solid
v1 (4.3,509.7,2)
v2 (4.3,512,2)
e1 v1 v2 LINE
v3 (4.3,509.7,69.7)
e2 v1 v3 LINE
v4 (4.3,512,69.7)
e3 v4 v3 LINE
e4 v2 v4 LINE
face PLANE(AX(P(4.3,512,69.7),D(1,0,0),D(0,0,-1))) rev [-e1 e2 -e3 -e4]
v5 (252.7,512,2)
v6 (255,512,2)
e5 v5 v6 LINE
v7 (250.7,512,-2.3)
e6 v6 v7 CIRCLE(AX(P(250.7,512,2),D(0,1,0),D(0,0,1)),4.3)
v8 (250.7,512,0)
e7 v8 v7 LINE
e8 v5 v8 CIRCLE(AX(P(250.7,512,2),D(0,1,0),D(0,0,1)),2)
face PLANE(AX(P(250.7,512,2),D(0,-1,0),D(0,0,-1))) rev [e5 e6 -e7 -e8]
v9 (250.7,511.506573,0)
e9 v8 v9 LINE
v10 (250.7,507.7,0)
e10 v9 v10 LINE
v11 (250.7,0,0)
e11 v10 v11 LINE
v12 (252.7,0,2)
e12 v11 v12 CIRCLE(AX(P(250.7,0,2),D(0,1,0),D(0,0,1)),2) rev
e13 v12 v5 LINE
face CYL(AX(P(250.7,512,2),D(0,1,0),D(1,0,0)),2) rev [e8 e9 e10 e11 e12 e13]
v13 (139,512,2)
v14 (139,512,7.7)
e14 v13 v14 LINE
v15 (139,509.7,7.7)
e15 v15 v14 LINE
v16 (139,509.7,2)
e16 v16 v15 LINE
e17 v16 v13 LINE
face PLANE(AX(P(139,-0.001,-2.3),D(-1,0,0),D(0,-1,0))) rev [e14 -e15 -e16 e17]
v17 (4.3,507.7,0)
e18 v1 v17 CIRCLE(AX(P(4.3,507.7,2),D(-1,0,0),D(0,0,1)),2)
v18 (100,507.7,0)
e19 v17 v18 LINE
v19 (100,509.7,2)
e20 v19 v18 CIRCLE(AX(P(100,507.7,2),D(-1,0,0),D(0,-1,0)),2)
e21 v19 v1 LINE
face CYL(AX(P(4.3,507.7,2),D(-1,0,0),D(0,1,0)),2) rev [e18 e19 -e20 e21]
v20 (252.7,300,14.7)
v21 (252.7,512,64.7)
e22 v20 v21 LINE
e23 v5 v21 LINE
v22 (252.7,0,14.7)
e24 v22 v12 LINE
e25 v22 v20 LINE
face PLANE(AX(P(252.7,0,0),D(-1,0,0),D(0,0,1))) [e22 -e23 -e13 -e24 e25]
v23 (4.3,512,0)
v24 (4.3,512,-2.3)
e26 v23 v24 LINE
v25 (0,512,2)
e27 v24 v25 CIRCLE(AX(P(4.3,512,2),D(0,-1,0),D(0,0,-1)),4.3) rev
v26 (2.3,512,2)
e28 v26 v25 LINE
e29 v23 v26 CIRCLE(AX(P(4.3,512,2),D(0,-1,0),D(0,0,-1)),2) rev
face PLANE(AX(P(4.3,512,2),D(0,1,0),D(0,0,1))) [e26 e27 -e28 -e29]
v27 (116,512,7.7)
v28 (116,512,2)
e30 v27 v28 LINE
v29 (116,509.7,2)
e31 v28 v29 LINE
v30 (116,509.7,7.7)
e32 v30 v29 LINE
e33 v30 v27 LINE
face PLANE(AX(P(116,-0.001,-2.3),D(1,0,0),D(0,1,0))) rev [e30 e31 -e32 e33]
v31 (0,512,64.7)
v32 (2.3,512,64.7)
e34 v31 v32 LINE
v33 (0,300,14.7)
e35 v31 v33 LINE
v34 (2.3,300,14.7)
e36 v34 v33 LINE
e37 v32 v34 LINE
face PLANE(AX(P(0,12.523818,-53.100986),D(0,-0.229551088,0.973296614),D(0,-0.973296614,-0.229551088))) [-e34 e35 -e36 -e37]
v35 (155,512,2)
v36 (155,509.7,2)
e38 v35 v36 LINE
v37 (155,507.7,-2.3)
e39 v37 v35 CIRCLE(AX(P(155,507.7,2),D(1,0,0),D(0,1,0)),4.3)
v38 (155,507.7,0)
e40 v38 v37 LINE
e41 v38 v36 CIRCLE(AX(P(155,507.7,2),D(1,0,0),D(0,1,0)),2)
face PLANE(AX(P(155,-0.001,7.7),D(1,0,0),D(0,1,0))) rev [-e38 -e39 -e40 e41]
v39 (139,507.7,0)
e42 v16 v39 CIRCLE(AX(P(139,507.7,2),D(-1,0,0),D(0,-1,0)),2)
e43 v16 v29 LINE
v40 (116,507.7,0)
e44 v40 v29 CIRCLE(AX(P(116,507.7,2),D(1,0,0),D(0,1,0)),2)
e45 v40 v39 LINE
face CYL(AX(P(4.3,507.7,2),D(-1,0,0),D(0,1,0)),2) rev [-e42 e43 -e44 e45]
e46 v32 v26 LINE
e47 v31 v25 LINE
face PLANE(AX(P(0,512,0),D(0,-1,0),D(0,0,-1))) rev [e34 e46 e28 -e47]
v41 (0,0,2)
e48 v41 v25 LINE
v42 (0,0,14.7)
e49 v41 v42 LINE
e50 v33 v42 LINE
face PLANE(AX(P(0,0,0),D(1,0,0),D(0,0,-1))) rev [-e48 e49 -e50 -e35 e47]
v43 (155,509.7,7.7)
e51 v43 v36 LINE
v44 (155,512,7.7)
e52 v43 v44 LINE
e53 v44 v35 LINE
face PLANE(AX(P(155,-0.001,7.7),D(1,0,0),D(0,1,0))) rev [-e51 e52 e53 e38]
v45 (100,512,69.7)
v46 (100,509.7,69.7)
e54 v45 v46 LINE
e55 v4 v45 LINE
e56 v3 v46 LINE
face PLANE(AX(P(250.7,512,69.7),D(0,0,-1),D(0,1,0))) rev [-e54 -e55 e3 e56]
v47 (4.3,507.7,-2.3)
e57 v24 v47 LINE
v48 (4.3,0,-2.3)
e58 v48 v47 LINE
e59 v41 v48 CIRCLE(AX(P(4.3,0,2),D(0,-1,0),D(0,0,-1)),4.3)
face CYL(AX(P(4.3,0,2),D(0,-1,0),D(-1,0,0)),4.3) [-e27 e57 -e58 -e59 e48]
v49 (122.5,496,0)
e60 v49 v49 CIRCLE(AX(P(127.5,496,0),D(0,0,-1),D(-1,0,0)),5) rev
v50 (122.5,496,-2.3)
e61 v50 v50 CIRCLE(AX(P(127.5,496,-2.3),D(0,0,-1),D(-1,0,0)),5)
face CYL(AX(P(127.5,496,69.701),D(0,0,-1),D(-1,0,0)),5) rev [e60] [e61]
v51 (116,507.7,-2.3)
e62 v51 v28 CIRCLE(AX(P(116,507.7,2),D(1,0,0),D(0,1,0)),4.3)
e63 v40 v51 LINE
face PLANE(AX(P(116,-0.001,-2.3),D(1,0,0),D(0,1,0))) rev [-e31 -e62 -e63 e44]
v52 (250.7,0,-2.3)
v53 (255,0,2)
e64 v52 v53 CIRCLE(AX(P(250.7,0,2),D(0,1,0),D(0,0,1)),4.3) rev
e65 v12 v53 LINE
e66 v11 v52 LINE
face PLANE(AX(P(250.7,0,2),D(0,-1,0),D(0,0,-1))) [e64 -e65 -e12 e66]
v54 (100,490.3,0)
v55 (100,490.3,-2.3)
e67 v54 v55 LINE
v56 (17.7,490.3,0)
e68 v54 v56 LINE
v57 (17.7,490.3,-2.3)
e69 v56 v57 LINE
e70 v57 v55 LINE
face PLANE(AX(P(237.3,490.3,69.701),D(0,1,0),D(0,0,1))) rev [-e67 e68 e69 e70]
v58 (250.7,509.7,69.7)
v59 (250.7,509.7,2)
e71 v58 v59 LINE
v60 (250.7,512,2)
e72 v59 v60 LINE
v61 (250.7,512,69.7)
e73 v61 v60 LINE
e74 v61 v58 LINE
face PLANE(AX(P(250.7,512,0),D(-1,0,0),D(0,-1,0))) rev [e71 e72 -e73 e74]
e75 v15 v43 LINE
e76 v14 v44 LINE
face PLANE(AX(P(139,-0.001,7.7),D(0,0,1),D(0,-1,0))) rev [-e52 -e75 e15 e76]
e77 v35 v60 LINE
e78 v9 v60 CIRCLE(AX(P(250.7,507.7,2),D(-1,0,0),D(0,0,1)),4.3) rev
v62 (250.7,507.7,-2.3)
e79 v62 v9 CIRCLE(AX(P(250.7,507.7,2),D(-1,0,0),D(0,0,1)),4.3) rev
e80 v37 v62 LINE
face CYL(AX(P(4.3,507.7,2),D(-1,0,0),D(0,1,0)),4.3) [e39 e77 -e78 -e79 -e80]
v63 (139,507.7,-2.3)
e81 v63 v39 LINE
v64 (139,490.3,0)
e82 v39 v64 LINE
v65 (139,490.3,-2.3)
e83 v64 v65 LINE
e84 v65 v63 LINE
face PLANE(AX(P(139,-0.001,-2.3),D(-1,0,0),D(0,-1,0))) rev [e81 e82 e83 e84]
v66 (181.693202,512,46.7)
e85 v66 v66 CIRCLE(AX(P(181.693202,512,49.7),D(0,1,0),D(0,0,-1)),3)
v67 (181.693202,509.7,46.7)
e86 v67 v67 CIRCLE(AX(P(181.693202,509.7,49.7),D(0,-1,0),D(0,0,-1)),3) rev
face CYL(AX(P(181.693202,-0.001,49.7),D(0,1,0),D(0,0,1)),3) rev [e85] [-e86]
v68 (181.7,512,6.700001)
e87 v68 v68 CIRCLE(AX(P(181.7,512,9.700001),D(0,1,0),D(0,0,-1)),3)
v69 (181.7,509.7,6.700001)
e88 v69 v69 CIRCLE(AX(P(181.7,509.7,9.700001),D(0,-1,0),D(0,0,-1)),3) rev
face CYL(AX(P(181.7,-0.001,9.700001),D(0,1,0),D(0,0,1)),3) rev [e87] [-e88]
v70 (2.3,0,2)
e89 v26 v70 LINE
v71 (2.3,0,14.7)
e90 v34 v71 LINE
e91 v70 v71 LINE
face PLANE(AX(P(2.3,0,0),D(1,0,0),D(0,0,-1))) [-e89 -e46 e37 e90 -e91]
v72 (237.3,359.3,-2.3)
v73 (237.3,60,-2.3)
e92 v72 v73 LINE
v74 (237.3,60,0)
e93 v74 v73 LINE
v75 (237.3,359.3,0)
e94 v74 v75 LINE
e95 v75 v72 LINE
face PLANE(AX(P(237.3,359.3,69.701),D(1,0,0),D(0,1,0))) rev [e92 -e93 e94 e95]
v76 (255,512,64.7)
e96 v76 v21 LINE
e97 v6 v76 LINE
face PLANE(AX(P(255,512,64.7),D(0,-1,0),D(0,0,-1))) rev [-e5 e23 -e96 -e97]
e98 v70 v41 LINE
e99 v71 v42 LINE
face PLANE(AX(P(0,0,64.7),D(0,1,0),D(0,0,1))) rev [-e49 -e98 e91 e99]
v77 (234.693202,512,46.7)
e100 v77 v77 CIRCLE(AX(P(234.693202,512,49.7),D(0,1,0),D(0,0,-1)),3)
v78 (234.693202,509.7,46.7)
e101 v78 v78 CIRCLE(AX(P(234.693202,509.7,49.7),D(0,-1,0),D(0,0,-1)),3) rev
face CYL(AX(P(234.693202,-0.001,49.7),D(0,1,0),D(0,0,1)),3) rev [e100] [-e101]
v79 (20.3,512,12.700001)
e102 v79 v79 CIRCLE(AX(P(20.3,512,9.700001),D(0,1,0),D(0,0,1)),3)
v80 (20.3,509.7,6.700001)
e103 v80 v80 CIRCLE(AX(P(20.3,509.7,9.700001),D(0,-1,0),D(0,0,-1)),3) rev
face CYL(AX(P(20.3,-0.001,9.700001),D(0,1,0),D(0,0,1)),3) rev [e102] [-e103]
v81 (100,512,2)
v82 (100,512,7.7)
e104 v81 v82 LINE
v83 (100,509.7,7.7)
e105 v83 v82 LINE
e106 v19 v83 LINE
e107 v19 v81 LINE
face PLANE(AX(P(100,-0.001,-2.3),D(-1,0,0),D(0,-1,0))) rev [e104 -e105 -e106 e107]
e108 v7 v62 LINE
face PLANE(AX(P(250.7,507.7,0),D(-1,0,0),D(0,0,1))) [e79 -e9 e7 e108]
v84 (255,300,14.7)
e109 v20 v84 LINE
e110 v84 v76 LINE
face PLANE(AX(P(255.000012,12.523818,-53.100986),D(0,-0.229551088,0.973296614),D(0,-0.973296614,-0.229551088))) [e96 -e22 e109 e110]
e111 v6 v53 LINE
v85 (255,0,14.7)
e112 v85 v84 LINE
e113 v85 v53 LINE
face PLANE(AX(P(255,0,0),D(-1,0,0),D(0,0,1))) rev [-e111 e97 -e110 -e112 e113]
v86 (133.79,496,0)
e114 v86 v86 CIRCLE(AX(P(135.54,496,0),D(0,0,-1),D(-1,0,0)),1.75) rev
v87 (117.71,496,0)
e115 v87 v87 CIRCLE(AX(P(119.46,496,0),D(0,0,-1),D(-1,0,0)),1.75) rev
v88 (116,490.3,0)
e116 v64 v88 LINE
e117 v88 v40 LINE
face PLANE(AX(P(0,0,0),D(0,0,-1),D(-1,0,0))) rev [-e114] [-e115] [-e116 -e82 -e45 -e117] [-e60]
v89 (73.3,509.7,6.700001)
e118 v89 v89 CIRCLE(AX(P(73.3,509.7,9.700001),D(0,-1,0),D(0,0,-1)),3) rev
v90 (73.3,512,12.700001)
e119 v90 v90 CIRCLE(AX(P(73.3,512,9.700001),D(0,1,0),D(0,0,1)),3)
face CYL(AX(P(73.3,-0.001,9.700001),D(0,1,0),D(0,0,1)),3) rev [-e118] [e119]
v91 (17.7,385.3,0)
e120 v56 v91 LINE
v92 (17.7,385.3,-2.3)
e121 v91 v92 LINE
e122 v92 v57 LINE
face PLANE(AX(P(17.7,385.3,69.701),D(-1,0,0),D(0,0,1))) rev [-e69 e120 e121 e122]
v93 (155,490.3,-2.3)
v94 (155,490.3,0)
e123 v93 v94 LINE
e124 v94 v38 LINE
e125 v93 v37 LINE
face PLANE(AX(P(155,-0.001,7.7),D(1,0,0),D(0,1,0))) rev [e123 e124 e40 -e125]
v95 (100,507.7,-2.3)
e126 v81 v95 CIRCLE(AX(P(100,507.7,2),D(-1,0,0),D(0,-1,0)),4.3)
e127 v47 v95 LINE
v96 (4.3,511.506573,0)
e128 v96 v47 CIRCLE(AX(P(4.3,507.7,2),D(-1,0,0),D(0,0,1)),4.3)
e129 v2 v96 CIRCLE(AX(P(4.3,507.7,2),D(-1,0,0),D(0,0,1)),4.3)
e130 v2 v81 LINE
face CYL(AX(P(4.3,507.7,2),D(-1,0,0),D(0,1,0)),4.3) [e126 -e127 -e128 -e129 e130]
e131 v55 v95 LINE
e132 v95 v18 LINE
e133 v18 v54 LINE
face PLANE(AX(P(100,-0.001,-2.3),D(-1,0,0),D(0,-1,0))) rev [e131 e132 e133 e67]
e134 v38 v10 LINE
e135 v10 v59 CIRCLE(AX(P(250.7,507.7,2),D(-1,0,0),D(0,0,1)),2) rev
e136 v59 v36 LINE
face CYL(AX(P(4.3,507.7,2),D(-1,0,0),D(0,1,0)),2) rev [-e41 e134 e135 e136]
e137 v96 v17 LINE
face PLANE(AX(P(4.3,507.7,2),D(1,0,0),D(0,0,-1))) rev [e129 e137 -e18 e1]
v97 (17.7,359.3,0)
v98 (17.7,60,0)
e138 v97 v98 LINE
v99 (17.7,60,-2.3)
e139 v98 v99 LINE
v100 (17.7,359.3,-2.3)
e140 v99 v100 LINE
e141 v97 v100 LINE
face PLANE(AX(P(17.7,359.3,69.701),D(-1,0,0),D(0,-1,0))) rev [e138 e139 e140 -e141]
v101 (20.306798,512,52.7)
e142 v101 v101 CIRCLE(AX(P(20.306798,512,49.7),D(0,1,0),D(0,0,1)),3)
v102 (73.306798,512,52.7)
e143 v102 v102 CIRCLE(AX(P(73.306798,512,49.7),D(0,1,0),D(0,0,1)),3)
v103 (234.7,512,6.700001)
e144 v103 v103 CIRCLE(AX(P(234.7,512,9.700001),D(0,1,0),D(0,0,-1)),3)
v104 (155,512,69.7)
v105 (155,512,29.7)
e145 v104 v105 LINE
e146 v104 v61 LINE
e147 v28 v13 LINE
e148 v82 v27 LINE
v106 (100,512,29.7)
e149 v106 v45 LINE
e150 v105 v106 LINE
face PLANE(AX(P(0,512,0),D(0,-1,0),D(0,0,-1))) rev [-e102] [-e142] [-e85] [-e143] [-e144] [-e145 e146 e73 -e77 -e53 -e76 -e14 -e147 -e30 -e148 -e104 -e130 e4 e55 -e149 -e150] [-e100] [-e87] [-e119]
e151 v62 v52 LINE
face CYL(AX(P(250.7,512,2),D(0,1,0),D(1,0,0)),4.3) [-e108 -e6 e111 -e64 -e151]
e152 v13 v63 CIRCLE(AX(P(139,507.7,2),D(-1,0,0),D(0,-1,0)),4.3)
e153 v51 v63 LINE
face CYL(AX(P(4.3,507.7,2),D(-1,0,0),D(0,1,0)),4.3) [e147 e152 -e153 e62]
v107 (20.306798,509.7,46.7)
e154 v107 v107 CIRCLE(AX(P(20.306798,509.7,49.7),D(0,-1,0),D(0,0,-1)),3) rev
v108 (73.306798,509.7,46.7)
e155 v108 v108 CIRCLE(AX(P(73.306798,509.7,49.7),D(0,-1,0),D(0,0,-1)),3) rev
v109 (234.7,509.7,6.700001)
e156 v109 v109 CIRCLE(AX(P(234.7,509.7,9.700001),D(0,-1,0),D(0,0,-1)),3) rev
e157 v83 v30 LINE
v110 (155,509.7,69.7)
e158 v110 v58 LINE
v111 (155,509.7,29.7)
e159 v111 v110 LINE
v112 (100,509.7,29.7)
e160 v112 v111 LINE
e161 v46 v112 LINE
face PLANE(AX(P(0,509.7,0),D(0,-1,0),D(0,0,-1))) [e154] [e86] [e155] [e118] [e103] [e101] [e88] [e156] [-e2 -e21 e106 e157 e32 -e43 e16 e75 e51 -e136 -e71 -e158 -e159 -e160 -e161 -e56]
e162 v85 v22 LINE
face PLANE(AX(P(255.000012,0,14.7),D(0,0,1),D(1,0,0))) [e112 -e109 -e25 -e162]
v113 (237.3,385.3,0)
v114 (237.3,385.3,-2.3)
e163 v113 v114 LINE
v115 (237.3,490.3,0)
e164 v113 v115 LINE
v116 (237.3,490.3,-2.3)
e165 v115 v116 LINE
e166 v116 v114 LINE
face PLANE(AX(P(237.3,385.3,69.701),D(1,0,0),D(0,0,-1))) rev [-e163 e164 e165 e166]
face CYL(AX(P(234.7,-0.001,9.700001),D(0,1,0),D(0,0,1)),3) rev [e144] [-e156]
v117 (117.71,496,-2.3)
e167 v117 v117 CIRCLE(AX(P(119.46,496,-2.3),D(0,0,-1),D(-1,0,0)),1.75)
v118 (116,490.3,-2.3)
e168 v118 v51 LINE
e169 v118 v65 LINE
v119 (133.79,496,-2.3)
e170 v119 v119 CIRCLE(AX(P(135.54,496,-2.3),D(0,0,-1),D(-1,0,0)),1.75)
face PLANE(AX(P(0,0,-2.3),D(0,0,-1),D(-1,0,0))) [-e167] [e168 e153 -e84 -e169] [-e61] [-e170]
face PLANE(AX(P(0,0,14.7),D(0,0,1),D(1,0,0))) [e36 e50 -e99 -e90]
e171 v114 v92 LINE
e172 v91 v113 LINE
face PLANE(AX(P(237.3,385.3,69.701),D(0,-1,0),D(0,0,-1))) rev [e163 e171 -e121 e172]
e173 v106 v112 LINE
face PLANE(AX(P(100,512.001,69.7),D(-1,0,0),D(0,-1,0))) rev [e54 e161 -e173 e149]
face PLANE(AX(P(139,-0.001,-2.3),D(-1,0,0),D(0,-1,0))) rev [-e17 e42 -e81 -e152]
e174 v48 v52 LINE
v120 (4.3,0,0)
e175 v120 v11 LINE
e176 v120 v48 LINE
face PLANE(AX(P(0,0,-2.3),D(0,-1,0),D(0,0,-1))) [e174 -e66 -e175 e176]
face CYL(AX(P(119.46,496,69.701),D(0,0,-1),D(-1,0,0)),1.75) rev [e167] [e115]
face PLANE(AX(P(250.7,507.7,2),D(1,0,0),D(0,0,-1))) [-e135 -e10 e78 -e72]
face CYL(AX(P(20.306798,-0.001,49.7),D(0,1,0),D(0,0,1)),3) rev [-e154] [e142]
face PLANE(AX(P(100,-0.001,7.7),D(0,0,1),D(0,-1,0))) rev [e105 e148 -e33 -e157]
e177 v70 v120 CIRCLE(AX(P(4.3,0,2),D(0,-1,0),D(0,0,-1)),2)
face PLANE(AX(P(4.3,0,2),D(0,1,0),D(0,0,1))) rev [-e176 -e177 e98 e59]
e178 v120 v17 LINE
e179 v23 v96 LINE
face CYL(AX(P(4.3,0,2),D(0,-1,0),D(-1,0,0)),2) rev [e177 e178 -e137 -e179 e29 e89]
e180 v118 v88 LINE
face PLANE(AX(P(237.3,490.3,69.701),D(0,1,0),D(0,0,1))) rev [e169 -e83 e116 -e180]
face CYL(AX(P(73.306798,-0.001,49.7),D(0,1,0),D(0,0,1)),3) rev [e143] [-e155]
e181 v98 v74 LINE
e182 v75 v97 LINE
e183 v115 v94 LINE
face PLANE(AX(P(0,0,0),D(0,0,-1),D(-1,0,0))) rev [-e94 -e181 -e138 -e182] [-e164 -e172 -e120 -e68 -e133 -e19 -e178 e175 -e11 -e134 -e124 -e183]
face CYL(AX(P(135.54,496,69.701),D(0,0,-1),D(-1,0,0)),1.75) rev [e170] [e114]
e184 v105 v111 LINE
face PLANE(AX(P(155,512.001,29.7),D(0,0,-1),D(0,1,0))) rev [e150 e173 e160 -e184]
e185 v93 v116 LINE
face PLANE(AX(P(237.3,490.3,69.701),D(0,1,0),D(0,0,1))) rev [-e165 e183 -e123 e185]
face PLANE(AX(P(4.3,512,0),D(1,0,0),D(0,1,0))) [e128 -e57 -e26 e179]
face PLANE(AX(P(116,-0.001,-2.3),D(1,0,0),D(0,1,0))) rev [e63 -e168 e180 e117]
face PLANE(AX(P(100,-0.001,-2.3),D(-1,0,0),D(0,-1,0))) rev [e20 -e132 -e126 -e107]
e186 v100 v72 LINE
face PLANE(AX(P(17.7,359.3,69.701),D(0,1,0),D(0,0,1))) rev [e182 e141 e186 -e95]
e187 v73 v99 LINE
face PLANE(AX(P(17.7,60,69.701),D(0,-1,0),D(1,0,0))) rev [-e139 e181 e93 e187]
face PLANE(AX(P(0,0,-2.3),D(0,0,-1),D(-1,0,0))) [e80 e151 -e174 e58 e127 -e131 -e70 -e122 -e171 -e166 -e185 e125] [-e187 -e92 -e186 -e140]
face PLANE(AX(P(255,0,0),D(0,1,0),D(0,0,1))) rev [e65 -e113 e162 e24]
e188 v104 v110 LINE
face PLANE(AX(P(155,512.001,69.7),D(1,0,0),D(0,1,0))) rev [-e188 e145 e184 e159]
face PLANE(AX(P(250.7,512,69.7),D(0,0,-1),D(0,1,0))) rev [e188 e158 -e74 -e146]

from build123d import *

# Parameters (mm, degrees)
SKETCH1_W                    = 255
SKETCH1_H                    = 512
BASE_FLANGE1_DEPTH           = 2.3
EDGE_FLANGE2_STRIP_W         = 13.2
EDGE_FLANGE2_STRIP_H         = 2.3
EDGE_FLANGE2_STRIP_CUT_DEPTH = 512
EDGE_FLANGE2_DEPTH           = 512
EDGE_FLANGE3_STRIP_W         = 13.2
EDGE_FLANGE3_STRIP_H         = 2.3
EDGE_FLANGE3_STRIP_CUT_DEPTH = 512
EDGE_FLANGE3_DEPTH           = 512
CUT_EXTRUDE2_START           = -10
CUT_EXTRUDE2_DEPTH           = 586.634510779
EDGE_FLANGE4_STRIP_W         = 13.2
EDGE_FLANGE4_STRIP_H         = 2.3
EDGE_FLANGE4_STRIP_CUT_DEPTH = 246.4
EDGE_FLANGE4_DEPTH           = 246.4
CUT_EXTRUDE3_REACH           = 578.501
SKETCH23_W                   = 219.6
SKETCH23_H                   = 299.3
CUT_EXTRUDE4_REACH           = 578.501
SKETCH24_W                   = 219.6
SKETCH24_H                   = 105
CUT_EXTRUDE6_REACH           = 576.175
SKETCH25_W                   = 55
SKETCH25_H                   = 40
CUT_EXTRUDE7_REACH           = 578.218
SKETCH27_W                   = 16
SKETCH27_H                   = 10
CUT_EXTRUDE8_REACH           = 578.501
SKETCH28_R                   = 5
CUT_EXTRUDE9_REACH           = 578.501
SKETCH29_R                   = 1.75
CUT_EXTRUDE10_REACH          = 578.218
SKETCH30_R                   = 3


# Sheet-metal steps are written as plain solids
with BuildPart() as part:
    # Sketch1 → Base-Flange1 (new body)
    with BuildSketch(Plane.XY):
        with Locations((127.5, 256)):
            Rectangle(SKETCH1_W, SKETCH1_H)
    extrude(amount=-BASE_FLANGE1_DEPTH)

    # Edge-Flange2 strip (across the edge) → Edge-Flange2 strip cut (cut)
    with BuildSketch(Plane(origin=(255, 0, 0), x_dir=(-1, 0, 0), z_dir=(0, 1, 0))):
        with Locations((-2.3, -1.15)):
            Rectangle(EDGE_FLANGE2_STRIP_W, EDGE_FLANGE2_STRIP_H)
    extrude(amount=EDGE_FLANGE2_STRIP_CUT_DEPTH, mode=Mode.SUBTRACT)

    # Edge-Flange2 section (across the edge) → Edge-Flange2 (add)
    with BuildSketch(Plane(origin=(255, 0, 0), x_dir=(-1, 0, 0), z_dir=(0, 1, 0))):
        with BuildLine():
            Line((0, 2), (0, 64.7))
            Line((0, 64.7), (2.3, 64.7))
            Line((2.3, 64.7), (2.3, 2))
            ThreePointArc((2.3, 2), (2.885786438, 0.585786438), (4.3, 0))
            Line((4.3, 0), (4.3, -2.3))
            ThreePointArc((4.3, -2.3), (1.259440841, -1.040559159), (0, 2))
        make_face()
    extrude(amount=EDGE_FLANGE2_DEPTH)

    # Edge-Flange3 strip (across the edge) → Edge-Flange3 strip cut (cut)
    with BuildSketch(Plane.XZ.offset(-512)):
        with Locations((-2.3, -1.15)):
            Rectangle(EDGE_FLANGE3_STRIP_W, EDGE_FLANGE3_STRIP_H)
    extrude(amount=EDGE_FLANGE3_STRIP_CUT_DEPTH, mode=Mode.SUBTRACT)

    # Edge-Flange3 section (across the edge) → Edge-Flange3 (add)
    with BuildSketch(Plane.XZ.offset(-512)):
        with BuildLine():
            Line((0, 2), (0, 64.7))
            Line((0, 64.7), (2.3, 64.7))
            Line((2.3, 64.7), (2.3, 2))
            ThreePointArc((2.3, 2), (2.885786438, 0.585786438), (4.3, 0))
            Line((4.3, 0), (4.3, -2.3))
            ThreePointArc((4.3, -2.3), (1.259440841, -1.040559159), (0, 2))
        make_face()
    extrude(amount=EDGE_FLANGE3_DEPTH)

    # Sketch17 → Cut-Extrude2 (cut)
    with BuildSketch(Plane(origin=(255, 0, 0), x_dir=(0, 0, -1), z_dir=(1, 0, 0)).offset(CUT_EXTRUDE2_START)):
        Polygon((-14.7, -1042.730361711), (-14.7, 0), (-14.7, 300), (-64.7, 512), (-64.7, 0), (-64.7, -1042.730361711), (-64.7, -3128.191085133), (-14.7, -3128.191085133), align=None)
    cut_extrude2 = extrude(amount=CUT_EXTRUDE2_DEPTH, mode=Mode.SUBTRACT)

    # Mirror6: Cut-Extrude2 across plane
    add(cut_extrude2.mirror(Plane(origin=(126.35, 0, 0), x_dir=(0, 0, 1), z_dir=(1, 0, 0))), mode=Mode.SUBTRACT)

    # Edge-Flange4 strip (across the edge) → Edge-Flange4 strip cut (cut)
    with BuildSketch(Plane(origin=(250.7, 512, 0), x_dir=(0, -1, 0), z_dir=(-1, 0, 0))):
        with Locations((-2.3, -1.15)):
            Rectangle(EDGE_FLANGE4_STRIP_W, EDGE_FLANGE4_STRIP_H)
    extrude(amount=EDGE_FLANGE4_STRIP_CUT_DEPTH, mode=Mode.SUBTRACT)

    # Edge-Flange4 section (across the edge) → Edge-Flange4 (add)
    with BuildSketch(Plane(origin=(250.7, 512, 0), x_dir=(0, -1, 0), z_dir=(-1, 0, 0))):
        with BuildLine():
            Line((0, 2), (0, 69.7))
            Line((0, 69.7), (2.3, 69.7))
            Line((2.3, 69.7), (2.3, 2))
            ThreePointArc((2.3, 2), (2.885786438, 0.585786438), (4.3, 0))
            Line((4.3, 0), (4.3, -2.3))
            ThreePointArc((4.3, -2.3), (1.259440841, -1.040559159), (0, 2))
        make_face()
    extrude(amount=EDGE_FLANGE4_DEPTH)

    # Sketch23 → Cut-Extrude3 (cut, up to next)
    with BuildSketch(Plane(origin=(0, 0, -2.3), x_dir=(-1, 0, 0), z_dir=(0, 0, -1)), mode=Mode.PRIVATE) as cut_extrude3_sk1:
        with Locations((-127.5, 209.65)):
            Rectangle(SKETCH23_W, SKETCH23_H)
    cut_extrude3_tool1 = extrude(cut_extrude3_sk1.sketch, amount=-CUT_EXTRUDE3_REACH, mode=Mode.PRIVATE) & part.part
    add(cut_extrude3_tool1.solids().sort_by_distance((127.5, 209.65, -2.3))[0], mode=Mode.SUBTRACT)

    # Sketch24 → Cut-Extrude4 (cut, up to next)
    with BuildSketch(Plane(origin=(0, 0, -2.3), x_dir=(-1, 0, 0), z_dir=(0, 0, -1)), mode=Mode.PRIVATE) as cut_extrude4_sk1:
        with Locations((-127.5, 437.8)):
            Rectangle(SKETCH24_W, SKETCH24_H)
    cut_extrude4_tool1 = extrude(cut_extrude4_sk1.sketch, amount=-CUT_EXTRUDE4_REACH, mode=Mode.PRIVATE) & part.part
    add(cut_extrude4_tool1.solids().sort_by_distance((127.5, 437.8, -2.3))[0], mode=Mode.SUBTRACT)

    # Sketch25 → Cut-Extrude6 (cut, up to next)
    with BuildSketch(Plane.XZ.offset(-509.7), mode=Mode.PRIVATE) as cut_extrude6_sk1:
        with Locations((127.5, 49.7)):
            Rectangle(SKETCH25_W, SKETCH25_H)
    cut_extrude6_tool1 = extrude(cut_extrude6_sk1.sketch, amount=-CUT_EXTRUDE6_REACH, mode=Mode.PRIVATE) & part.part
    add(cut_extrude6_tool1.solids().sort_by_distance((127.5, 509.7, 49.7))[0], mode=Mode.SUBTRACT)

    # Sketch27 → Cut-Extrude7 (cut, up to next)
    with BuildSketch(Plane(origin=(0, 512, 0), x_dir=(1, 0, 0), z_dir=(0, 1, 0)), mode=Mode.PRIVATE) as cut_extrude7_sk1:
        with Locations((108, -2.7)):
            Rectangle(SKETCH27_W, SKETCH27_H)
    cut_extrude7_tool1 = extrude(cut_extrude7_sk1.sketch, amount=-CUT_EXTRUDE7_REACH, mode=Mode.PRIVATE) & part.part
    # Sketch27 → Cut-Extrude7 (cut, up to next)
    with BuildSketch(Plane(origin=(0, 512, 0), x_dir=(1, 0, 0), z_dir=(0, 1, 0)), mode=Mode.PRIVATE) as cut_extrude7_sk2:
        with Locations((147, -2.7)):
            Rectangle(SKETCH27_W, SKETCH27_H)
    cut_extrude7_tool2 = extrude(cut_extrude7_sk2.sketch, amount=-CUT_EXTRUDE7_REACH, mode=Mode.PRIVATE) & part.part
    add(cut_extrude7_tool1.solids().sort_by_distance((108, 512, 2.7))[0], mode=Mode.SUBTRACT)
    add(cut_extrude7_tool2.solids().sort_by_distance((147, 512, 2.7))[0], mode=Mode.SUBTRACT)

    # Sketch28 → Cut-Extrude8 (cut, up to next)
    with BuildSketch(Plane(origin=(0, 0, -2.3), x_dir=(-1, 0, 0), z_dir=(0, 0, -1)), mode=Mode.PRIVATE) as cut_extrude8_sk1:
        with Locations((-127.5, 496)):
            Circle(SKETCH28_R)
    cut_extrude8_tool1 = extrude(cut_extrude8_sk1.sketch, amount=-CUT_EXTRUDE8_REACH, mode=Mode.PRIVATE) & part.part
    add(cut_extrude8_tool1.solids().sort_by_distance((127.5, 496, -2.3))[0], mode=Mode.SUBTRACT)

    # Sketch29 → Cut-Extrude9 (cut, up to next)
    with BuildSketch(Plane(origin=(0, 0, -2.3), x_dir=(-1, 0, 0), z_dir=(0, 0, -1)), mode=Mode.PRIVATE) as cut_extrude9_sk1:
        with Locations((-119.46, 496)):
            Circle(SKETCH29_R)
    cut_extrude9_tool1 = extrude(cut_extrude9_sk1.sketch, amount=-CUT_EXTRUDE9_REACH, mode=Mode.PRIVATE) & part.part
    # Sketch29 → Cut-Extrude9 (cut, up to next)
    with BuildSketch(Plane(origin=(0, 0, -2.3), x_dir=(-1, 0, 0), z_dir=(0, 0, -1)), mode=Mode.PRIVATE) as cut_extrude9_sk2:
        with Locations((-135.54, 496)):
            Circle(SKETCH29_R)
    cut_extrude9_tool2 = extrude(cut_extrude9_sk2.sketch, amount=-CUT_EXTRUDE9_REACH, mode=Mode.PRIVATE) & part.part
    add(cut_extrude9_tool1.solids().sort_by_distance((119.46, 496, -2.3))[0], mode=Mode.SUBTRACT)
    add(cut_extrude9_tool2.solids().sort_by_distance((135.54, 496, -2.3))[0], mode=Mode.SUBTRACT)

    # Sketch30 → Cut-Extrude10 (cut, up to next)
    with BuildSketch(Plane(origin=(0, 512, 0), x_dir=(1, 0, 0), z_dir=(0, 1, 0)), mode=Mode.PRIVATE) as cut_extrude10_sk1:
        with Locations(Location((20.3, -9.700000578, 0), (0, 0, 270))):
            Circle(SKETCH30_R)
    cut_extrude10_tool1 = extrude(cut_extrude10_sk1.sketch, amount=-CUT_EXTRUDE10_REACH, mode=Mode.PRIVATE) & part.part
    # Sketch30 → Cut-Extrude10 (cut, up to next)
    with BuildSketch(Plane(origin=(0, 512, 0), x_dir=(1, 0, 0), z_dir=(0, 1, 0)), mode=Mode.PRIVATE) as cut_extrude10_sk2:
        with Locations(Location((73.3, -9.700000578, 0), (0, 0, 270))):
            Circle(SKETCH30_R)
    cut_extrude10_tool2 = extrude(cut_extrude10_sk2.sketch, amount=-CUT_EXTRUDE10_REACH, mode=Mode.PRIVATE) & part.part
    # Sketch30 → Cut-Extrude10 (cut, up to next)
    with BuildSketch(Plane(origin=(0, 512, 0), x_dir=(1, 0, 0), z_dir=(0, 1, 0)), mode=Mode.PRIVATE) as cut_extrude10_sk3:
        with Locations(Location((20.306798441, -49.7, 0), (0, 0, 270))):
            Circle(SKETCH30_R)
    cut_extrude10_tool3 = extrude(cut_extrude10_sk3.sketch, amount=-CUT_EXTRUDE10_REACH, mode=Mode.PRIVATE) & part.part
    # Sketch30 → Cut-Extrude10 (cut, up to next)
    with BuildSketch(Plane(origin=(0, 512, 0), x_dir=(1, 0, 0), z_dir=(0, 1, 0)), mode=Mode.PRIVATE) as cut_extrude10_sk4:
        with Locations(Location((73.306798441, -49.7, 0), (0, 0, 270))):
            Circle(SKETCH30_R)
    cut_extrude10_tool4 = extrude(cut_extrude10_sk4.sketch, amount=-CUT_EXTRUDE10_REACH, mode=Mode.PRIVATE) & part.part
    # Sketch30 → Cut-Extrude10 (cut, up to next)
    with BuildSketch(Plane(origin=(0, 512, 0), x_dir=(1, 0, 0), z_dir=(0, 1, 0)), mode=Mode.PRIVATE) as cut_extrude10_sk5:
        with Locations(Location((181.693201559, -49.7, 0), (0, 0, 90))):
            Circle(SKETCH30_R)
    cut_extrude10_tool5 = extrude(cut_extrude10_sk5.sketch, amount=-CUT_EXTRUDE10_REACH, mode=Mode.PRIVATE) & part.part
    # Sketch30 → Cut-Extrude10 (cut, up to next)
    with BuildSketch(Plane(origin=(0, 512, 0), x_dir=(1, 0, 0), z_dir=(0, 1, 0)), mode=Mode.PRIVATE) as cut_extrude10_sk6:
        with Locations(Location((234.693201559, -49.7, 0), (0, 0, 90))):
            Circle(SKETCH30_R)
    cut_extrude10_tool6 = extrude(cut_extrude10_sk6.sketch, amount=-CUT_EXTRUDE10_REACH, mode=Mode.PRIVATE) & part.part
    # Sketch30 → Cut-Extrude10 (cut, up to next)
    with BuildSketch(Plane(origin=(0, 512, 0), x_dir=(1, 0, 0), z_dir=(0, 1, 0)), mode=Mode.PRIVATE) as cut_extrude10_sk7:
        with Locations(Location((181.7, -9.700000578, 0), (0, 0, 90))):
            Circle(SKETCH30_R)
    cut_extrude10_tool7 = extrude(cut_extrude10_sk7.sketch, amount=-CUT_EXTRUDE10_REACH, mode=Mode.PRIVATE) & part.part
    # Sketch30 → Cut-Extrude10 (cut, up to next)
    with BuildSketch(Plane(origin=(0, 512, 0), x_dir=(1, 0, 0), z_dir=(0, 1, 0)), mode=Mode.PRIVATE) as cut_extrude10_sk8:
        with Locations(Location((234.7, -9.700000578, 0), (0, 0, 90))):
            Circle(SKETCH30_R)
    cut_extrude10_tool8 = extrude(cut_extrude10_sk8.sketch, amount=-CUT_EXTRUDE10_REACH, mode=Mode.PRIVATE) & part.part
    add(cut_extrude10_tool1.solids().sort_by_distance((20.3, 512, 9.700001))[0], mode=Mode.SUBTRACT)
    add(cut_extrude10_tool2.solids().sort_by_distance((73.3, 512, 9.700001))[0], mode=Mode.SUBTRACT)
    add(cut_extrude10_tool3.solids().sort_by_distance((20.306798, 512, 49.7))[0], mode=Mode.SUBTRACT)
    add(cut_extrude10_tool4.solids().sort_by_distance((73.306798, 512, 49.7))[0], mode=Mode.SUBTRACT)
    add(cut_extrude10_tool5.solids().sort_by_distance((181.693202, 512, 49.7))[0], mode=Mode.SUBTRACT)
    add(cut_extrude10_tool6.solids().sort_by_distance((234.693202, 512, 49.7))[0], mode=Mode.SUBTRACT)
    add(cut_extrude10_tool7.solids().sort_by_distance((181.7, 512, 9.700001))[0], mode=Mode.SUBTRACT)
    add(cut_extrude10_tool8.solids().sort_by_distance((234.7, 512, 9.700001))[0], mode=Mode.SUBTRACT)


solid = part.part
